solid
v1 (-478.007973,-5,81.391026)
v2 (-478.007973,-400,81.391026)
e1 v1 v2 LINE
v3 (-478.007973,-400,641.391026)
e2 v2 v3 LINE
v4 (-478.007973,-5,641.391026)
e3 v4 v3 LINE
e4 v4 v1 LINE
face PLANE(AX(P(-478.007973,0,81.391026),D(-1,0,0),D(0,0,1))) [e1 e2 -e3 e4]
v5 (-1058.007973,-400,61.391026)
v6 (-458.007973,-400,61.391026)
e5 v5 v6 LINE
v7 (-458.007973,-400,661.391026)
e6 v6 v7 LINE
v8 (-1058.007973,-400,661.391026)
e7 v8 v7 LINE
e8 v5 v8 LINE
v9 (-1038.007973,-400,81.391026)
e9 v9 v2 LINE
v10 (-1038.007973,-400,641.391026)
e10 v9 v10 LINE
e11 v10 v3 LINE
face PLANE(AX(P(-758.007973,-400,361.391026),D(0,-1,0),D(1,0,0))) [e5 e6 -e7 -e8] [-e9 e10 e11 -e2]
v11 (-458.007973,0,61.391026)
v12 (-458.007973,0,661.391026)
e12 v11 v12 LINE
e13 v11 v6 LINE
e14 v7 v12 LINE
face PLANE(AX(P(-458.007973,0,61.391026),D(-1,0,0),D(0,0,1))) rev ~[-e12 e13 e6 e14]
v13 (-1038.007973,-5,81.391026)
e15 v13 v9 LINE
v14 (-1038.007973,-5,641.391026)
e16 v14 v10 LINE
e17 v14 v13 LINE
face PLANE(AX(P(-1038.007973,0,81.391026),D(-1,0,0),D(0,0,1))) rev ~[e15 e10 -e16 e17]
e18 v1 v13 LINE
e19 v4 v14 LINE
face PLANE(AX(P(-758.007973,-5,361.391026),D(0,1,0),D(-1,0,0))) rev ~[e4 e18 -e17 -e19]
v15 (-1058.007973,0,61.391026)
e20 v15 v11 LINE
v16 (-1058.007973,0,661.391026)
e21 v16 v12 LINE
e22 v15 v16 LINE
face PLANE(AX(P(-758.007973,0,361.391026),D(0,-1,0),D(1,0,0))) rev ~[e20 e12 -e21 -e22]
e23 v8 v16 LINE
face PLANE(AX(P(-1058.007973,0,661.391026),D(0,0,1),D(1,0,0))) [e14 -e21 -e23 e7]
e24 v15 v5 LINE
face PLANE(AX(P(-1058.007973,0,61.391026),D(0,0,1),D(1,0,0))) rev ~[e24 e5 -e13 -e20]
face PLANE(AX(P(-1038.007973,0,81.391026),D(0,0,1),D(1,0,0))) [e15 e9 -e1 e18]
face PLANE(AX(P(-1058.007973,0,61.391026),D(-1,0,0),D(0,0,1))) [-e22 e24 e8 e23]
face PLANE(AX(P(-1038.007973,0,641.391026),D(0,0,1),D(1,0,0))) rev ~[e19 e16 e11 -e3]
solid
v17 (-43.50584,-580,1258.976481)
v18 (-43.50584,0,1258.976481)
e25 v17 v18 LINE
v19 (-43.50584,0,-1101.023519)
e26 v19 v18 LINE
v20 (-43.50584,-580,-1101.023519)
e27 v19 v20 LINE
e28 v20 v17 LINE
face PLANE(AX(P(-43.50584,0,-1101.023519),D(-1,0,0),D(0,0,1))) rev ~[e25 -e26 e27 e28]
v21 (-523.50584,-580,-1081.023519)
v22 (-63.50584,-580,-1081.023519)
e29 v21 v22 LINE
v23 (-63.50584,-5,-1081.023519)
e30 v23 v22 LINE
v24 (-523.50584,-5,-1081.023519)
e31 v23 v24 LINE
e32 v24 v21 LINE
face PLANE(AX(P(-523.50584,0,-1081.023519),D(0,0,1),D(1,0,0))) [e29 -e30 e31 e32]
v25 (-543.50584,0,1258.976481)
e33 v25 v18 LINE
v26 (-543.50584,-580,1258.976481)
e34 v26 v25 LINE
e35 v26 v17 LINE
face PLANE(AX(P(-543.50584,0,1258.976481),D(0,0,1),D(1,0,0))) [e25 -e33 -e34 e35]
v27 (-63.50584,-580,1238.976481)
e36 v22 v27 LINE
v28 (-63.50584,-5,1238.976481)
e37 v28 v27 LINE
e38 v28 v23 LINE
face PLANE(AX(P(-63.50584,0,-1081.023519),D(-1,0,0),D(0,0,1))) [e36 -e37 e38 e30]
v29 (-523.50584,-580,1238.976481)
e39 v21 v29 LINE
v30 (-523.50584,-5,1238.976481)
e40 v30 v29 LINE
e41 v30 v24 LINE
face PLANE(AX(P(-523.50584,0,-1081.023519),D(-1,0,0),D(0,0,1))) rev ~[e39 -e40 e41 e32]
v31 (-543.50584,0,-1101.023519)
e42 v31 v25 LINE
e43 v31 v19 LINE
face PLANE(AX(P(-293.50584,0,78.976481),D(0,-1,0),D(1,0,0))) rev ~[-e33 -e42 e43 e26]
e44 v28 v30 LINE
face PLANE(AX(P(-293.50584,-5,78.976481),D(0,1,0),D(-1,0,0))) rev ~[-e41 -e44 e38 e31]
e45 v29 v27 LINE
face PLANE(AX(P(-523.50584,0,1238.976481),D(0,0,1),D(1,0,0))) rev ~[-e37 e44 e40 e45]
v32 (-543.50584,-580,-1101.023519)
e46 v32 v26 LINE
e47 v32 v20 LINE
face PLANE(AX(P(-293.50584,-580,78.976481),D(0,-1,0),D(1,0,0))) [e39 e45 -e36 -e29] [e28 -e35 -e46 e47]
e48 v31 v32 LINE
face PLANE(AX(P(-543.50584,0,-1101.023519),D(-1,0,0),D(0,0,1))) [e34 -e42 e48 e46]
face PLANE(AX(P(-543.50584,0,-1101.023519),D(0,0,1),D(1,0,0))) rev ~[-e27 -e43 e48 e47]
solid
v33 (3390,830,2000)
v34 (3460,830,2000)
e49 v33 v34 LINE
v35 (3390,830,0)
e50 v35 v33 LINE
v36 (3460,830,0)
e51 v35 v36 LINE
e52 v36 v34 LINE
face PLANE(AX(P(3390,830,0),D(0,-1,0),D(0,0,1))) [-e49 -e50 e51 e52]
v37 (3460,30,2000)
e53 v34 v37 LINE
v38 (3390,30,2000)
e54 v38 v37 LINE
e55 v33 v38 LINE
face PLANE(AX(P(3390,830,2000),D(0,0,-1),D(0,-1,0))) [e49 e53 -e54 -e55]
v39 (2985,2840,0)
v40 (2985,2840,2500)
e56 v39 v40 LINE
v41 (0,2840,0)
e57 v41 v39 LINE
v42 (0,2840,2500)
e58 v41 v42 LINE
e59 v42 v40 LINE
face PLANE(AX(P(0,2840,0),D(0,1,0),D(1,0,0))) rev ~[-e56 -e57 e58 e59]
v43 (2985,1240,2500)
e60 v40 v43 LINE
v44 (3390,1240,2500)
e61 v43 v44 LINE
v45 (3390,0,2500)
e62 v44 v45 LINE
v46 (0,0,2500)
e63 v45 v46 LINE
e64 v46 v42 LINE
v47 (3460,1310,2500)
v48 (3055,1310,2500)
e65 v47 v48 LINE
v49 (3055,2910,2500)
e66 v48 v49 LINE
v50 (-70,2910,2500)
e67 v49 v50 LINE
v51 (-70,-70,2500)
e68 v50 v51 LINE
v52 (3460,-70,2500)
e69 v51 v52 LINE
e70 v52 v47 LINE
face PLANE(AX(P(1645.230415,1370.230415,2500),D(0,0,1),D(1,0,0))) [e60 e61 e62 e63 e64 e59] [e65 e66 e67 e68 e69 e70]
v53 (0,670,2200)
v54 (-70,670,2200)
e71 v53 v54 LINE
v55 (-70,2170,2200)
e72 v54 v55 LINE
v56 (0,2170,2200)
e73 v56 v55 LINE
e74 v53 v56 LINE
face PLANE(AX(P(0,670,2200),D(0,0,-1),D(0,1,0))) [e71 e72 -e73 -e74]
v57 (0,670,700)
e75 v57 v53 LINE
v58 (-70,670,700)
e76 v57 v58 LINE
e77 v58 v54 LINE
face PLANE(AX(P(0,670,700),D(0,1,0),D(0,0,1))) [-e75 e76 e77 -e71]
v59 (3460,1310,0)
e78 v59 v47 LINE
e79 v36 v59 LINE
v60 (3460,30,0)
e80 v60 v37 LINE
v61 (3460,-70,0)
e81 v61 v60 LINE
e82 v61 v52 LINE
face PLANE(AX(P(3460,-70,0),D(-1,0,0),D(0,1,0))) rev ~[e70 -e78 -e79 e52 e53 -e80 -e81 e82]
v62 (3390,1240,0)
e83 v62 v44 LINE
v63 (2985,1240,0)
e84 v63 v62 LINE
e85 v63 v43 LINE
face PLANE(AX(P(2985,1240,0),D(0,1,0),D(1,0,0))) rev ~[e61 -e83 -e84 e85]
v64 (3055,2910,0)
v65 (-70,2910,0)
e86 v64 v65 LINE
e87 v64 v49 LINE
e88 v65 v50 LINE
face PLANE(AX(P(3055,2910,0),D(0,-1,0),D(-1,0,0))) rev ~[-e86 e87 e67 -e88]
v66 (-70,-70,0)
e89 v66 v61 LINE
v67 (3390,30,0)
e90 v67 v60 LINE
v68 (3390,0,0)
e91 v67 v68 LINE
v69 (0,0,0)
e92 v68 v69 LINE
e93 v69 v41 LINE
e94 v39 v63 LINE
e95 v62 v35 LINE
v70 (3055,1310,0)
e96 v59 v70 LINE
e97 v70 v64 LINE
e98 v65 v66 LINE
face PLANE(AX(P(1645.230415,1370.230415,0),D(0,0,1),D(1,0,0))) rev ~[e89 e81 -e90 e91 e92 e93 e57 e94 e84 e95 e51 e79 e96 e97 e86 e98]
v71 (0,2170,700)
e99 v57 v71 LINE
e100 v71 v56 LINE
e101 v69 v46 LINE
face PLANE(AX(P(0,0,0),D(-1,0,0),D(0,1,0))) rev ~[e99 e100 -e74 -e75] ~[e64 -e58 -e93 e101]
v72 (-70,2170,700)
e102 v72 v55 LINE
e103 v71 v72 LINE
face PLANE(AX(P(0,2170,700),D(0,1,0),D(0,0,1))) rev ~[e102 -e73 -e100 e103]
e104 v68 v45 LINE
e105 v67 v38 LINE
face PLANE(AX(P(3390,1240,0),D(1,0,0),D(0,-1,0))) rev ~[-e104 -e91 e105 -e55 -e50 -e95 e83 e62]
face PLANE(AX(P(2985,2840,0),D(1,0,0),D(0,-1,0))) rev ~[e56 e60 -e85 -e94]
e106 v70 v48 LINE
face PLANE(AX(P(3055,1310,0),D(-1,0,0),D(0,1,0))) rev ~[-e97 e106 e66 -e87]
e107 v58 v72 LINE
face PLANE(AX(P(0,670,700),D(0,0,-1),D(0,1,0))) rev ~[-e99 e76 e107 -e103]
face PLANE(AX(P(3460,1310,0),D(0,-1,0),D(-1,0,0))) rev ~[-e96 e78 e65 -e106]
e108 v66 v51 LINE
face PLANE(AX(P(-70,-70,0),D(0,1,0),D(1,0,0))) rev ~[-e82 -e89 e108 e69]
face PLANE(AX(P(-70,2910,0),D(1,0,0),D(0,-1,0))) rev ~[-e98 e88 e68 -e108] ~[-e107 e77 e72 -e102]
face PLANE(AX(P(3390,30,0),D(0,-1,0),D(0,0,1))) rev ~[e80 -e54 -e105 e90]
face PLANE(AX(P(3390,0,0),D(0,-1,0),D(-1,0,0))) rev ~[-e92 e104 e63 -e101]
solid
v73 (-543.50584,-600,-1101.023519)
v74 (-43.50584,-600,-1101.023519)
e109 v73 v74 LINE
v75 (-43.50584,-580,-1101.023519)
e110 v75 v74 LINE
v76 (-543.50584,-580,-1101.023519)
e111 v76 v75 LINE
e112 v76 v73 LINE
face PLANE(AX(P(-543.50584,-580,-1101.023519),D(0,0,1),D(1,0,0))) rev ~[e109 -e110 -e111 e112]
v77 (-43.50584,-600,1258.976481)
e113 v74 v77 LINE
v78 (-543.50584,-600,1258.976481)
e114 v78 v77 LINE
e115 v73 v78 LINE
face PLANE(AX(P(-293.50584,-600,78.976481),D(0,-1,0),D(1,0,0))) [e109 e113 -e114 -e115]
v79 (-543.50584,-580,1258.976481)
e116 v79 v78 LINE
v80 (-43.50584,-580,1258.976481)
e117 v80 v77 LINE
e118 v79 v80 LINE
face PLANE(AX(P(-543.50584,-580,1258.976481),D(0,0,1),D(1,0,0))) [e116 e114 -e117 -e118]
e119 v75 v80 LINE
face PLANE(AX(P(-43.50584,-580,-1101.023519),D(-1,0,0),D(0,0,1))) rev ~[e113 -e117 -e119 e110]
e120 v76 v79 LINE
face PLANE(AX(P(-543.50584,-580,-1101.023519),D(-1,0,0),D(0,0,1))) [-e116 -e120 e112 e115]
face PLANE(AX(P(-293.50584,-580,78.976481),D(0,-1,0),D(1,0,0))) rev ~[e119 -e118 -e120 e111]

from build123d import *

# Parameters (mm, degrees)
F1_DEPTH  = 2500
F2_W      = 800
F2_H      = 2000
F3_DEPTH  = 70
F4_W      = 1500
F4_H      = 1500
F5_DEPTH  = 70
F6_W      = 500
F6_H      = 2360
F6_W_2    = 460
F6_H_2    = 2320
F7_DEPTH  = 580
F8_W      = 500
F8_H      = 2360
F9_DEPTH  = 5
F10_W     = 500
F10_H     = 2360
F11_DEPTH = 20
F12_W     = 600
F12_H     = 600
F12_W_2   = 560
F12_H_2   = 560
F13_DEPTH = 400
F14_W     = 600
F14_H     = 600
F15_DEPTH = 5


with BuildPart() as f1:
    # F0 (on Top) → F1 (new body)
    with BuildSketch(Plane.XY):
        Polygon((3460, -70), (3460, 830), (3460, 1310), (3055, 1310), (3055, 2910), (-70, 2910), (-70, -70), align=None)
        Polygon((3390, 0), (0, 0), (0, 2840), (2985, 2840), (2985, 1240), (3390, 1240), (3390, 830), align=None, mode=Mode.SUBTRACT)
    extrude(amount=F1_DEPTH)

    # F2 (on face) → F3 (cut, through all)
    with BuildSketch(Plane(origin=(3390, 0, 0), x_dir=(0, -1, 0), z_dir=(-1, 0, 0))):
        with Locations((-430, 1000)):
            Rectangle(F2_W, F2_H)
    extrude(amount=-F3_DEPTH, mode=Mode.SUBTRACT)

    # F4 (on face) → F5 (cut, through all)
    with BuildSketch(Plane.YZ):
        with Locations((1420, 1450)):
            Rectangle(F4_W, F4_H)
    extrude(amount=-F5_DEPTH, mode=Mode.SUBTRACT)


with BuildPart() as f7:
    # F6 (on Front) → F7 (new body)
    with BuildSketch(Plane.XZ):
        with Locations((-293.5058398881, 78.9764812216)):
            Rectangle(F6_W, F6_H)
        with Locations((-293.5058398881, 78.9764812216)):
            Rectangle(F6_W_2, F6_H_2, mode=Mode.SUBTRACT)
    extrude(amount=F7_DEPTH)

    # F8 (on face) → F9 (join)
    with BuildSketch(Plane(origin=(0, 0, 0), x_dir=(-1, 0, 0), z_dir=(0, 1, 0))):
        with Locations((293.5058398881, 78.9764812216)):
            Rectangle(F8_W, F8_H)
    extrude(amount=-F9_DEPTH)


with BuildPart() as f11:
    # F10 (on face) → F11 (new body)
    with BuildSketch(Plane.XZ.offset(580)):
        with Locations((-293.5058398881, 78.9764812216)):
            Rectangle(F10_W, F10_H)
    extrude(amount=F11_DEPTH)


with BuildPart() as f13:
    # F12 (on Front) → F13 (new body)
    with BuildSketch(Plane.XZ):
        with Locations((-758.0079734325, 361.3910255028)):
            Rectangle(F12_W, F12_H)
        with Locations((-758.0079734325, 361.3910255028)):
            Rectangle(F12_W_2, F12_H_2, mode=Mode.SUBTRACT)
    extrude(amount=F13_DEPTH)

    # F14 (on face) → F15 (join)
    with BuildSketch(Plane(origin=(0, 0, 0), x_dir=(-1, 0, 0), z_dir=(0, 1, 0))):
        with Locations((758.0079734325, 361.3910255028)):
            Rectangle(F14_W, F14_H)
    extrude(amount=-F15_DEPTH)


solid = Compound([f1.part, f7.part, f11.part, f13.part])
